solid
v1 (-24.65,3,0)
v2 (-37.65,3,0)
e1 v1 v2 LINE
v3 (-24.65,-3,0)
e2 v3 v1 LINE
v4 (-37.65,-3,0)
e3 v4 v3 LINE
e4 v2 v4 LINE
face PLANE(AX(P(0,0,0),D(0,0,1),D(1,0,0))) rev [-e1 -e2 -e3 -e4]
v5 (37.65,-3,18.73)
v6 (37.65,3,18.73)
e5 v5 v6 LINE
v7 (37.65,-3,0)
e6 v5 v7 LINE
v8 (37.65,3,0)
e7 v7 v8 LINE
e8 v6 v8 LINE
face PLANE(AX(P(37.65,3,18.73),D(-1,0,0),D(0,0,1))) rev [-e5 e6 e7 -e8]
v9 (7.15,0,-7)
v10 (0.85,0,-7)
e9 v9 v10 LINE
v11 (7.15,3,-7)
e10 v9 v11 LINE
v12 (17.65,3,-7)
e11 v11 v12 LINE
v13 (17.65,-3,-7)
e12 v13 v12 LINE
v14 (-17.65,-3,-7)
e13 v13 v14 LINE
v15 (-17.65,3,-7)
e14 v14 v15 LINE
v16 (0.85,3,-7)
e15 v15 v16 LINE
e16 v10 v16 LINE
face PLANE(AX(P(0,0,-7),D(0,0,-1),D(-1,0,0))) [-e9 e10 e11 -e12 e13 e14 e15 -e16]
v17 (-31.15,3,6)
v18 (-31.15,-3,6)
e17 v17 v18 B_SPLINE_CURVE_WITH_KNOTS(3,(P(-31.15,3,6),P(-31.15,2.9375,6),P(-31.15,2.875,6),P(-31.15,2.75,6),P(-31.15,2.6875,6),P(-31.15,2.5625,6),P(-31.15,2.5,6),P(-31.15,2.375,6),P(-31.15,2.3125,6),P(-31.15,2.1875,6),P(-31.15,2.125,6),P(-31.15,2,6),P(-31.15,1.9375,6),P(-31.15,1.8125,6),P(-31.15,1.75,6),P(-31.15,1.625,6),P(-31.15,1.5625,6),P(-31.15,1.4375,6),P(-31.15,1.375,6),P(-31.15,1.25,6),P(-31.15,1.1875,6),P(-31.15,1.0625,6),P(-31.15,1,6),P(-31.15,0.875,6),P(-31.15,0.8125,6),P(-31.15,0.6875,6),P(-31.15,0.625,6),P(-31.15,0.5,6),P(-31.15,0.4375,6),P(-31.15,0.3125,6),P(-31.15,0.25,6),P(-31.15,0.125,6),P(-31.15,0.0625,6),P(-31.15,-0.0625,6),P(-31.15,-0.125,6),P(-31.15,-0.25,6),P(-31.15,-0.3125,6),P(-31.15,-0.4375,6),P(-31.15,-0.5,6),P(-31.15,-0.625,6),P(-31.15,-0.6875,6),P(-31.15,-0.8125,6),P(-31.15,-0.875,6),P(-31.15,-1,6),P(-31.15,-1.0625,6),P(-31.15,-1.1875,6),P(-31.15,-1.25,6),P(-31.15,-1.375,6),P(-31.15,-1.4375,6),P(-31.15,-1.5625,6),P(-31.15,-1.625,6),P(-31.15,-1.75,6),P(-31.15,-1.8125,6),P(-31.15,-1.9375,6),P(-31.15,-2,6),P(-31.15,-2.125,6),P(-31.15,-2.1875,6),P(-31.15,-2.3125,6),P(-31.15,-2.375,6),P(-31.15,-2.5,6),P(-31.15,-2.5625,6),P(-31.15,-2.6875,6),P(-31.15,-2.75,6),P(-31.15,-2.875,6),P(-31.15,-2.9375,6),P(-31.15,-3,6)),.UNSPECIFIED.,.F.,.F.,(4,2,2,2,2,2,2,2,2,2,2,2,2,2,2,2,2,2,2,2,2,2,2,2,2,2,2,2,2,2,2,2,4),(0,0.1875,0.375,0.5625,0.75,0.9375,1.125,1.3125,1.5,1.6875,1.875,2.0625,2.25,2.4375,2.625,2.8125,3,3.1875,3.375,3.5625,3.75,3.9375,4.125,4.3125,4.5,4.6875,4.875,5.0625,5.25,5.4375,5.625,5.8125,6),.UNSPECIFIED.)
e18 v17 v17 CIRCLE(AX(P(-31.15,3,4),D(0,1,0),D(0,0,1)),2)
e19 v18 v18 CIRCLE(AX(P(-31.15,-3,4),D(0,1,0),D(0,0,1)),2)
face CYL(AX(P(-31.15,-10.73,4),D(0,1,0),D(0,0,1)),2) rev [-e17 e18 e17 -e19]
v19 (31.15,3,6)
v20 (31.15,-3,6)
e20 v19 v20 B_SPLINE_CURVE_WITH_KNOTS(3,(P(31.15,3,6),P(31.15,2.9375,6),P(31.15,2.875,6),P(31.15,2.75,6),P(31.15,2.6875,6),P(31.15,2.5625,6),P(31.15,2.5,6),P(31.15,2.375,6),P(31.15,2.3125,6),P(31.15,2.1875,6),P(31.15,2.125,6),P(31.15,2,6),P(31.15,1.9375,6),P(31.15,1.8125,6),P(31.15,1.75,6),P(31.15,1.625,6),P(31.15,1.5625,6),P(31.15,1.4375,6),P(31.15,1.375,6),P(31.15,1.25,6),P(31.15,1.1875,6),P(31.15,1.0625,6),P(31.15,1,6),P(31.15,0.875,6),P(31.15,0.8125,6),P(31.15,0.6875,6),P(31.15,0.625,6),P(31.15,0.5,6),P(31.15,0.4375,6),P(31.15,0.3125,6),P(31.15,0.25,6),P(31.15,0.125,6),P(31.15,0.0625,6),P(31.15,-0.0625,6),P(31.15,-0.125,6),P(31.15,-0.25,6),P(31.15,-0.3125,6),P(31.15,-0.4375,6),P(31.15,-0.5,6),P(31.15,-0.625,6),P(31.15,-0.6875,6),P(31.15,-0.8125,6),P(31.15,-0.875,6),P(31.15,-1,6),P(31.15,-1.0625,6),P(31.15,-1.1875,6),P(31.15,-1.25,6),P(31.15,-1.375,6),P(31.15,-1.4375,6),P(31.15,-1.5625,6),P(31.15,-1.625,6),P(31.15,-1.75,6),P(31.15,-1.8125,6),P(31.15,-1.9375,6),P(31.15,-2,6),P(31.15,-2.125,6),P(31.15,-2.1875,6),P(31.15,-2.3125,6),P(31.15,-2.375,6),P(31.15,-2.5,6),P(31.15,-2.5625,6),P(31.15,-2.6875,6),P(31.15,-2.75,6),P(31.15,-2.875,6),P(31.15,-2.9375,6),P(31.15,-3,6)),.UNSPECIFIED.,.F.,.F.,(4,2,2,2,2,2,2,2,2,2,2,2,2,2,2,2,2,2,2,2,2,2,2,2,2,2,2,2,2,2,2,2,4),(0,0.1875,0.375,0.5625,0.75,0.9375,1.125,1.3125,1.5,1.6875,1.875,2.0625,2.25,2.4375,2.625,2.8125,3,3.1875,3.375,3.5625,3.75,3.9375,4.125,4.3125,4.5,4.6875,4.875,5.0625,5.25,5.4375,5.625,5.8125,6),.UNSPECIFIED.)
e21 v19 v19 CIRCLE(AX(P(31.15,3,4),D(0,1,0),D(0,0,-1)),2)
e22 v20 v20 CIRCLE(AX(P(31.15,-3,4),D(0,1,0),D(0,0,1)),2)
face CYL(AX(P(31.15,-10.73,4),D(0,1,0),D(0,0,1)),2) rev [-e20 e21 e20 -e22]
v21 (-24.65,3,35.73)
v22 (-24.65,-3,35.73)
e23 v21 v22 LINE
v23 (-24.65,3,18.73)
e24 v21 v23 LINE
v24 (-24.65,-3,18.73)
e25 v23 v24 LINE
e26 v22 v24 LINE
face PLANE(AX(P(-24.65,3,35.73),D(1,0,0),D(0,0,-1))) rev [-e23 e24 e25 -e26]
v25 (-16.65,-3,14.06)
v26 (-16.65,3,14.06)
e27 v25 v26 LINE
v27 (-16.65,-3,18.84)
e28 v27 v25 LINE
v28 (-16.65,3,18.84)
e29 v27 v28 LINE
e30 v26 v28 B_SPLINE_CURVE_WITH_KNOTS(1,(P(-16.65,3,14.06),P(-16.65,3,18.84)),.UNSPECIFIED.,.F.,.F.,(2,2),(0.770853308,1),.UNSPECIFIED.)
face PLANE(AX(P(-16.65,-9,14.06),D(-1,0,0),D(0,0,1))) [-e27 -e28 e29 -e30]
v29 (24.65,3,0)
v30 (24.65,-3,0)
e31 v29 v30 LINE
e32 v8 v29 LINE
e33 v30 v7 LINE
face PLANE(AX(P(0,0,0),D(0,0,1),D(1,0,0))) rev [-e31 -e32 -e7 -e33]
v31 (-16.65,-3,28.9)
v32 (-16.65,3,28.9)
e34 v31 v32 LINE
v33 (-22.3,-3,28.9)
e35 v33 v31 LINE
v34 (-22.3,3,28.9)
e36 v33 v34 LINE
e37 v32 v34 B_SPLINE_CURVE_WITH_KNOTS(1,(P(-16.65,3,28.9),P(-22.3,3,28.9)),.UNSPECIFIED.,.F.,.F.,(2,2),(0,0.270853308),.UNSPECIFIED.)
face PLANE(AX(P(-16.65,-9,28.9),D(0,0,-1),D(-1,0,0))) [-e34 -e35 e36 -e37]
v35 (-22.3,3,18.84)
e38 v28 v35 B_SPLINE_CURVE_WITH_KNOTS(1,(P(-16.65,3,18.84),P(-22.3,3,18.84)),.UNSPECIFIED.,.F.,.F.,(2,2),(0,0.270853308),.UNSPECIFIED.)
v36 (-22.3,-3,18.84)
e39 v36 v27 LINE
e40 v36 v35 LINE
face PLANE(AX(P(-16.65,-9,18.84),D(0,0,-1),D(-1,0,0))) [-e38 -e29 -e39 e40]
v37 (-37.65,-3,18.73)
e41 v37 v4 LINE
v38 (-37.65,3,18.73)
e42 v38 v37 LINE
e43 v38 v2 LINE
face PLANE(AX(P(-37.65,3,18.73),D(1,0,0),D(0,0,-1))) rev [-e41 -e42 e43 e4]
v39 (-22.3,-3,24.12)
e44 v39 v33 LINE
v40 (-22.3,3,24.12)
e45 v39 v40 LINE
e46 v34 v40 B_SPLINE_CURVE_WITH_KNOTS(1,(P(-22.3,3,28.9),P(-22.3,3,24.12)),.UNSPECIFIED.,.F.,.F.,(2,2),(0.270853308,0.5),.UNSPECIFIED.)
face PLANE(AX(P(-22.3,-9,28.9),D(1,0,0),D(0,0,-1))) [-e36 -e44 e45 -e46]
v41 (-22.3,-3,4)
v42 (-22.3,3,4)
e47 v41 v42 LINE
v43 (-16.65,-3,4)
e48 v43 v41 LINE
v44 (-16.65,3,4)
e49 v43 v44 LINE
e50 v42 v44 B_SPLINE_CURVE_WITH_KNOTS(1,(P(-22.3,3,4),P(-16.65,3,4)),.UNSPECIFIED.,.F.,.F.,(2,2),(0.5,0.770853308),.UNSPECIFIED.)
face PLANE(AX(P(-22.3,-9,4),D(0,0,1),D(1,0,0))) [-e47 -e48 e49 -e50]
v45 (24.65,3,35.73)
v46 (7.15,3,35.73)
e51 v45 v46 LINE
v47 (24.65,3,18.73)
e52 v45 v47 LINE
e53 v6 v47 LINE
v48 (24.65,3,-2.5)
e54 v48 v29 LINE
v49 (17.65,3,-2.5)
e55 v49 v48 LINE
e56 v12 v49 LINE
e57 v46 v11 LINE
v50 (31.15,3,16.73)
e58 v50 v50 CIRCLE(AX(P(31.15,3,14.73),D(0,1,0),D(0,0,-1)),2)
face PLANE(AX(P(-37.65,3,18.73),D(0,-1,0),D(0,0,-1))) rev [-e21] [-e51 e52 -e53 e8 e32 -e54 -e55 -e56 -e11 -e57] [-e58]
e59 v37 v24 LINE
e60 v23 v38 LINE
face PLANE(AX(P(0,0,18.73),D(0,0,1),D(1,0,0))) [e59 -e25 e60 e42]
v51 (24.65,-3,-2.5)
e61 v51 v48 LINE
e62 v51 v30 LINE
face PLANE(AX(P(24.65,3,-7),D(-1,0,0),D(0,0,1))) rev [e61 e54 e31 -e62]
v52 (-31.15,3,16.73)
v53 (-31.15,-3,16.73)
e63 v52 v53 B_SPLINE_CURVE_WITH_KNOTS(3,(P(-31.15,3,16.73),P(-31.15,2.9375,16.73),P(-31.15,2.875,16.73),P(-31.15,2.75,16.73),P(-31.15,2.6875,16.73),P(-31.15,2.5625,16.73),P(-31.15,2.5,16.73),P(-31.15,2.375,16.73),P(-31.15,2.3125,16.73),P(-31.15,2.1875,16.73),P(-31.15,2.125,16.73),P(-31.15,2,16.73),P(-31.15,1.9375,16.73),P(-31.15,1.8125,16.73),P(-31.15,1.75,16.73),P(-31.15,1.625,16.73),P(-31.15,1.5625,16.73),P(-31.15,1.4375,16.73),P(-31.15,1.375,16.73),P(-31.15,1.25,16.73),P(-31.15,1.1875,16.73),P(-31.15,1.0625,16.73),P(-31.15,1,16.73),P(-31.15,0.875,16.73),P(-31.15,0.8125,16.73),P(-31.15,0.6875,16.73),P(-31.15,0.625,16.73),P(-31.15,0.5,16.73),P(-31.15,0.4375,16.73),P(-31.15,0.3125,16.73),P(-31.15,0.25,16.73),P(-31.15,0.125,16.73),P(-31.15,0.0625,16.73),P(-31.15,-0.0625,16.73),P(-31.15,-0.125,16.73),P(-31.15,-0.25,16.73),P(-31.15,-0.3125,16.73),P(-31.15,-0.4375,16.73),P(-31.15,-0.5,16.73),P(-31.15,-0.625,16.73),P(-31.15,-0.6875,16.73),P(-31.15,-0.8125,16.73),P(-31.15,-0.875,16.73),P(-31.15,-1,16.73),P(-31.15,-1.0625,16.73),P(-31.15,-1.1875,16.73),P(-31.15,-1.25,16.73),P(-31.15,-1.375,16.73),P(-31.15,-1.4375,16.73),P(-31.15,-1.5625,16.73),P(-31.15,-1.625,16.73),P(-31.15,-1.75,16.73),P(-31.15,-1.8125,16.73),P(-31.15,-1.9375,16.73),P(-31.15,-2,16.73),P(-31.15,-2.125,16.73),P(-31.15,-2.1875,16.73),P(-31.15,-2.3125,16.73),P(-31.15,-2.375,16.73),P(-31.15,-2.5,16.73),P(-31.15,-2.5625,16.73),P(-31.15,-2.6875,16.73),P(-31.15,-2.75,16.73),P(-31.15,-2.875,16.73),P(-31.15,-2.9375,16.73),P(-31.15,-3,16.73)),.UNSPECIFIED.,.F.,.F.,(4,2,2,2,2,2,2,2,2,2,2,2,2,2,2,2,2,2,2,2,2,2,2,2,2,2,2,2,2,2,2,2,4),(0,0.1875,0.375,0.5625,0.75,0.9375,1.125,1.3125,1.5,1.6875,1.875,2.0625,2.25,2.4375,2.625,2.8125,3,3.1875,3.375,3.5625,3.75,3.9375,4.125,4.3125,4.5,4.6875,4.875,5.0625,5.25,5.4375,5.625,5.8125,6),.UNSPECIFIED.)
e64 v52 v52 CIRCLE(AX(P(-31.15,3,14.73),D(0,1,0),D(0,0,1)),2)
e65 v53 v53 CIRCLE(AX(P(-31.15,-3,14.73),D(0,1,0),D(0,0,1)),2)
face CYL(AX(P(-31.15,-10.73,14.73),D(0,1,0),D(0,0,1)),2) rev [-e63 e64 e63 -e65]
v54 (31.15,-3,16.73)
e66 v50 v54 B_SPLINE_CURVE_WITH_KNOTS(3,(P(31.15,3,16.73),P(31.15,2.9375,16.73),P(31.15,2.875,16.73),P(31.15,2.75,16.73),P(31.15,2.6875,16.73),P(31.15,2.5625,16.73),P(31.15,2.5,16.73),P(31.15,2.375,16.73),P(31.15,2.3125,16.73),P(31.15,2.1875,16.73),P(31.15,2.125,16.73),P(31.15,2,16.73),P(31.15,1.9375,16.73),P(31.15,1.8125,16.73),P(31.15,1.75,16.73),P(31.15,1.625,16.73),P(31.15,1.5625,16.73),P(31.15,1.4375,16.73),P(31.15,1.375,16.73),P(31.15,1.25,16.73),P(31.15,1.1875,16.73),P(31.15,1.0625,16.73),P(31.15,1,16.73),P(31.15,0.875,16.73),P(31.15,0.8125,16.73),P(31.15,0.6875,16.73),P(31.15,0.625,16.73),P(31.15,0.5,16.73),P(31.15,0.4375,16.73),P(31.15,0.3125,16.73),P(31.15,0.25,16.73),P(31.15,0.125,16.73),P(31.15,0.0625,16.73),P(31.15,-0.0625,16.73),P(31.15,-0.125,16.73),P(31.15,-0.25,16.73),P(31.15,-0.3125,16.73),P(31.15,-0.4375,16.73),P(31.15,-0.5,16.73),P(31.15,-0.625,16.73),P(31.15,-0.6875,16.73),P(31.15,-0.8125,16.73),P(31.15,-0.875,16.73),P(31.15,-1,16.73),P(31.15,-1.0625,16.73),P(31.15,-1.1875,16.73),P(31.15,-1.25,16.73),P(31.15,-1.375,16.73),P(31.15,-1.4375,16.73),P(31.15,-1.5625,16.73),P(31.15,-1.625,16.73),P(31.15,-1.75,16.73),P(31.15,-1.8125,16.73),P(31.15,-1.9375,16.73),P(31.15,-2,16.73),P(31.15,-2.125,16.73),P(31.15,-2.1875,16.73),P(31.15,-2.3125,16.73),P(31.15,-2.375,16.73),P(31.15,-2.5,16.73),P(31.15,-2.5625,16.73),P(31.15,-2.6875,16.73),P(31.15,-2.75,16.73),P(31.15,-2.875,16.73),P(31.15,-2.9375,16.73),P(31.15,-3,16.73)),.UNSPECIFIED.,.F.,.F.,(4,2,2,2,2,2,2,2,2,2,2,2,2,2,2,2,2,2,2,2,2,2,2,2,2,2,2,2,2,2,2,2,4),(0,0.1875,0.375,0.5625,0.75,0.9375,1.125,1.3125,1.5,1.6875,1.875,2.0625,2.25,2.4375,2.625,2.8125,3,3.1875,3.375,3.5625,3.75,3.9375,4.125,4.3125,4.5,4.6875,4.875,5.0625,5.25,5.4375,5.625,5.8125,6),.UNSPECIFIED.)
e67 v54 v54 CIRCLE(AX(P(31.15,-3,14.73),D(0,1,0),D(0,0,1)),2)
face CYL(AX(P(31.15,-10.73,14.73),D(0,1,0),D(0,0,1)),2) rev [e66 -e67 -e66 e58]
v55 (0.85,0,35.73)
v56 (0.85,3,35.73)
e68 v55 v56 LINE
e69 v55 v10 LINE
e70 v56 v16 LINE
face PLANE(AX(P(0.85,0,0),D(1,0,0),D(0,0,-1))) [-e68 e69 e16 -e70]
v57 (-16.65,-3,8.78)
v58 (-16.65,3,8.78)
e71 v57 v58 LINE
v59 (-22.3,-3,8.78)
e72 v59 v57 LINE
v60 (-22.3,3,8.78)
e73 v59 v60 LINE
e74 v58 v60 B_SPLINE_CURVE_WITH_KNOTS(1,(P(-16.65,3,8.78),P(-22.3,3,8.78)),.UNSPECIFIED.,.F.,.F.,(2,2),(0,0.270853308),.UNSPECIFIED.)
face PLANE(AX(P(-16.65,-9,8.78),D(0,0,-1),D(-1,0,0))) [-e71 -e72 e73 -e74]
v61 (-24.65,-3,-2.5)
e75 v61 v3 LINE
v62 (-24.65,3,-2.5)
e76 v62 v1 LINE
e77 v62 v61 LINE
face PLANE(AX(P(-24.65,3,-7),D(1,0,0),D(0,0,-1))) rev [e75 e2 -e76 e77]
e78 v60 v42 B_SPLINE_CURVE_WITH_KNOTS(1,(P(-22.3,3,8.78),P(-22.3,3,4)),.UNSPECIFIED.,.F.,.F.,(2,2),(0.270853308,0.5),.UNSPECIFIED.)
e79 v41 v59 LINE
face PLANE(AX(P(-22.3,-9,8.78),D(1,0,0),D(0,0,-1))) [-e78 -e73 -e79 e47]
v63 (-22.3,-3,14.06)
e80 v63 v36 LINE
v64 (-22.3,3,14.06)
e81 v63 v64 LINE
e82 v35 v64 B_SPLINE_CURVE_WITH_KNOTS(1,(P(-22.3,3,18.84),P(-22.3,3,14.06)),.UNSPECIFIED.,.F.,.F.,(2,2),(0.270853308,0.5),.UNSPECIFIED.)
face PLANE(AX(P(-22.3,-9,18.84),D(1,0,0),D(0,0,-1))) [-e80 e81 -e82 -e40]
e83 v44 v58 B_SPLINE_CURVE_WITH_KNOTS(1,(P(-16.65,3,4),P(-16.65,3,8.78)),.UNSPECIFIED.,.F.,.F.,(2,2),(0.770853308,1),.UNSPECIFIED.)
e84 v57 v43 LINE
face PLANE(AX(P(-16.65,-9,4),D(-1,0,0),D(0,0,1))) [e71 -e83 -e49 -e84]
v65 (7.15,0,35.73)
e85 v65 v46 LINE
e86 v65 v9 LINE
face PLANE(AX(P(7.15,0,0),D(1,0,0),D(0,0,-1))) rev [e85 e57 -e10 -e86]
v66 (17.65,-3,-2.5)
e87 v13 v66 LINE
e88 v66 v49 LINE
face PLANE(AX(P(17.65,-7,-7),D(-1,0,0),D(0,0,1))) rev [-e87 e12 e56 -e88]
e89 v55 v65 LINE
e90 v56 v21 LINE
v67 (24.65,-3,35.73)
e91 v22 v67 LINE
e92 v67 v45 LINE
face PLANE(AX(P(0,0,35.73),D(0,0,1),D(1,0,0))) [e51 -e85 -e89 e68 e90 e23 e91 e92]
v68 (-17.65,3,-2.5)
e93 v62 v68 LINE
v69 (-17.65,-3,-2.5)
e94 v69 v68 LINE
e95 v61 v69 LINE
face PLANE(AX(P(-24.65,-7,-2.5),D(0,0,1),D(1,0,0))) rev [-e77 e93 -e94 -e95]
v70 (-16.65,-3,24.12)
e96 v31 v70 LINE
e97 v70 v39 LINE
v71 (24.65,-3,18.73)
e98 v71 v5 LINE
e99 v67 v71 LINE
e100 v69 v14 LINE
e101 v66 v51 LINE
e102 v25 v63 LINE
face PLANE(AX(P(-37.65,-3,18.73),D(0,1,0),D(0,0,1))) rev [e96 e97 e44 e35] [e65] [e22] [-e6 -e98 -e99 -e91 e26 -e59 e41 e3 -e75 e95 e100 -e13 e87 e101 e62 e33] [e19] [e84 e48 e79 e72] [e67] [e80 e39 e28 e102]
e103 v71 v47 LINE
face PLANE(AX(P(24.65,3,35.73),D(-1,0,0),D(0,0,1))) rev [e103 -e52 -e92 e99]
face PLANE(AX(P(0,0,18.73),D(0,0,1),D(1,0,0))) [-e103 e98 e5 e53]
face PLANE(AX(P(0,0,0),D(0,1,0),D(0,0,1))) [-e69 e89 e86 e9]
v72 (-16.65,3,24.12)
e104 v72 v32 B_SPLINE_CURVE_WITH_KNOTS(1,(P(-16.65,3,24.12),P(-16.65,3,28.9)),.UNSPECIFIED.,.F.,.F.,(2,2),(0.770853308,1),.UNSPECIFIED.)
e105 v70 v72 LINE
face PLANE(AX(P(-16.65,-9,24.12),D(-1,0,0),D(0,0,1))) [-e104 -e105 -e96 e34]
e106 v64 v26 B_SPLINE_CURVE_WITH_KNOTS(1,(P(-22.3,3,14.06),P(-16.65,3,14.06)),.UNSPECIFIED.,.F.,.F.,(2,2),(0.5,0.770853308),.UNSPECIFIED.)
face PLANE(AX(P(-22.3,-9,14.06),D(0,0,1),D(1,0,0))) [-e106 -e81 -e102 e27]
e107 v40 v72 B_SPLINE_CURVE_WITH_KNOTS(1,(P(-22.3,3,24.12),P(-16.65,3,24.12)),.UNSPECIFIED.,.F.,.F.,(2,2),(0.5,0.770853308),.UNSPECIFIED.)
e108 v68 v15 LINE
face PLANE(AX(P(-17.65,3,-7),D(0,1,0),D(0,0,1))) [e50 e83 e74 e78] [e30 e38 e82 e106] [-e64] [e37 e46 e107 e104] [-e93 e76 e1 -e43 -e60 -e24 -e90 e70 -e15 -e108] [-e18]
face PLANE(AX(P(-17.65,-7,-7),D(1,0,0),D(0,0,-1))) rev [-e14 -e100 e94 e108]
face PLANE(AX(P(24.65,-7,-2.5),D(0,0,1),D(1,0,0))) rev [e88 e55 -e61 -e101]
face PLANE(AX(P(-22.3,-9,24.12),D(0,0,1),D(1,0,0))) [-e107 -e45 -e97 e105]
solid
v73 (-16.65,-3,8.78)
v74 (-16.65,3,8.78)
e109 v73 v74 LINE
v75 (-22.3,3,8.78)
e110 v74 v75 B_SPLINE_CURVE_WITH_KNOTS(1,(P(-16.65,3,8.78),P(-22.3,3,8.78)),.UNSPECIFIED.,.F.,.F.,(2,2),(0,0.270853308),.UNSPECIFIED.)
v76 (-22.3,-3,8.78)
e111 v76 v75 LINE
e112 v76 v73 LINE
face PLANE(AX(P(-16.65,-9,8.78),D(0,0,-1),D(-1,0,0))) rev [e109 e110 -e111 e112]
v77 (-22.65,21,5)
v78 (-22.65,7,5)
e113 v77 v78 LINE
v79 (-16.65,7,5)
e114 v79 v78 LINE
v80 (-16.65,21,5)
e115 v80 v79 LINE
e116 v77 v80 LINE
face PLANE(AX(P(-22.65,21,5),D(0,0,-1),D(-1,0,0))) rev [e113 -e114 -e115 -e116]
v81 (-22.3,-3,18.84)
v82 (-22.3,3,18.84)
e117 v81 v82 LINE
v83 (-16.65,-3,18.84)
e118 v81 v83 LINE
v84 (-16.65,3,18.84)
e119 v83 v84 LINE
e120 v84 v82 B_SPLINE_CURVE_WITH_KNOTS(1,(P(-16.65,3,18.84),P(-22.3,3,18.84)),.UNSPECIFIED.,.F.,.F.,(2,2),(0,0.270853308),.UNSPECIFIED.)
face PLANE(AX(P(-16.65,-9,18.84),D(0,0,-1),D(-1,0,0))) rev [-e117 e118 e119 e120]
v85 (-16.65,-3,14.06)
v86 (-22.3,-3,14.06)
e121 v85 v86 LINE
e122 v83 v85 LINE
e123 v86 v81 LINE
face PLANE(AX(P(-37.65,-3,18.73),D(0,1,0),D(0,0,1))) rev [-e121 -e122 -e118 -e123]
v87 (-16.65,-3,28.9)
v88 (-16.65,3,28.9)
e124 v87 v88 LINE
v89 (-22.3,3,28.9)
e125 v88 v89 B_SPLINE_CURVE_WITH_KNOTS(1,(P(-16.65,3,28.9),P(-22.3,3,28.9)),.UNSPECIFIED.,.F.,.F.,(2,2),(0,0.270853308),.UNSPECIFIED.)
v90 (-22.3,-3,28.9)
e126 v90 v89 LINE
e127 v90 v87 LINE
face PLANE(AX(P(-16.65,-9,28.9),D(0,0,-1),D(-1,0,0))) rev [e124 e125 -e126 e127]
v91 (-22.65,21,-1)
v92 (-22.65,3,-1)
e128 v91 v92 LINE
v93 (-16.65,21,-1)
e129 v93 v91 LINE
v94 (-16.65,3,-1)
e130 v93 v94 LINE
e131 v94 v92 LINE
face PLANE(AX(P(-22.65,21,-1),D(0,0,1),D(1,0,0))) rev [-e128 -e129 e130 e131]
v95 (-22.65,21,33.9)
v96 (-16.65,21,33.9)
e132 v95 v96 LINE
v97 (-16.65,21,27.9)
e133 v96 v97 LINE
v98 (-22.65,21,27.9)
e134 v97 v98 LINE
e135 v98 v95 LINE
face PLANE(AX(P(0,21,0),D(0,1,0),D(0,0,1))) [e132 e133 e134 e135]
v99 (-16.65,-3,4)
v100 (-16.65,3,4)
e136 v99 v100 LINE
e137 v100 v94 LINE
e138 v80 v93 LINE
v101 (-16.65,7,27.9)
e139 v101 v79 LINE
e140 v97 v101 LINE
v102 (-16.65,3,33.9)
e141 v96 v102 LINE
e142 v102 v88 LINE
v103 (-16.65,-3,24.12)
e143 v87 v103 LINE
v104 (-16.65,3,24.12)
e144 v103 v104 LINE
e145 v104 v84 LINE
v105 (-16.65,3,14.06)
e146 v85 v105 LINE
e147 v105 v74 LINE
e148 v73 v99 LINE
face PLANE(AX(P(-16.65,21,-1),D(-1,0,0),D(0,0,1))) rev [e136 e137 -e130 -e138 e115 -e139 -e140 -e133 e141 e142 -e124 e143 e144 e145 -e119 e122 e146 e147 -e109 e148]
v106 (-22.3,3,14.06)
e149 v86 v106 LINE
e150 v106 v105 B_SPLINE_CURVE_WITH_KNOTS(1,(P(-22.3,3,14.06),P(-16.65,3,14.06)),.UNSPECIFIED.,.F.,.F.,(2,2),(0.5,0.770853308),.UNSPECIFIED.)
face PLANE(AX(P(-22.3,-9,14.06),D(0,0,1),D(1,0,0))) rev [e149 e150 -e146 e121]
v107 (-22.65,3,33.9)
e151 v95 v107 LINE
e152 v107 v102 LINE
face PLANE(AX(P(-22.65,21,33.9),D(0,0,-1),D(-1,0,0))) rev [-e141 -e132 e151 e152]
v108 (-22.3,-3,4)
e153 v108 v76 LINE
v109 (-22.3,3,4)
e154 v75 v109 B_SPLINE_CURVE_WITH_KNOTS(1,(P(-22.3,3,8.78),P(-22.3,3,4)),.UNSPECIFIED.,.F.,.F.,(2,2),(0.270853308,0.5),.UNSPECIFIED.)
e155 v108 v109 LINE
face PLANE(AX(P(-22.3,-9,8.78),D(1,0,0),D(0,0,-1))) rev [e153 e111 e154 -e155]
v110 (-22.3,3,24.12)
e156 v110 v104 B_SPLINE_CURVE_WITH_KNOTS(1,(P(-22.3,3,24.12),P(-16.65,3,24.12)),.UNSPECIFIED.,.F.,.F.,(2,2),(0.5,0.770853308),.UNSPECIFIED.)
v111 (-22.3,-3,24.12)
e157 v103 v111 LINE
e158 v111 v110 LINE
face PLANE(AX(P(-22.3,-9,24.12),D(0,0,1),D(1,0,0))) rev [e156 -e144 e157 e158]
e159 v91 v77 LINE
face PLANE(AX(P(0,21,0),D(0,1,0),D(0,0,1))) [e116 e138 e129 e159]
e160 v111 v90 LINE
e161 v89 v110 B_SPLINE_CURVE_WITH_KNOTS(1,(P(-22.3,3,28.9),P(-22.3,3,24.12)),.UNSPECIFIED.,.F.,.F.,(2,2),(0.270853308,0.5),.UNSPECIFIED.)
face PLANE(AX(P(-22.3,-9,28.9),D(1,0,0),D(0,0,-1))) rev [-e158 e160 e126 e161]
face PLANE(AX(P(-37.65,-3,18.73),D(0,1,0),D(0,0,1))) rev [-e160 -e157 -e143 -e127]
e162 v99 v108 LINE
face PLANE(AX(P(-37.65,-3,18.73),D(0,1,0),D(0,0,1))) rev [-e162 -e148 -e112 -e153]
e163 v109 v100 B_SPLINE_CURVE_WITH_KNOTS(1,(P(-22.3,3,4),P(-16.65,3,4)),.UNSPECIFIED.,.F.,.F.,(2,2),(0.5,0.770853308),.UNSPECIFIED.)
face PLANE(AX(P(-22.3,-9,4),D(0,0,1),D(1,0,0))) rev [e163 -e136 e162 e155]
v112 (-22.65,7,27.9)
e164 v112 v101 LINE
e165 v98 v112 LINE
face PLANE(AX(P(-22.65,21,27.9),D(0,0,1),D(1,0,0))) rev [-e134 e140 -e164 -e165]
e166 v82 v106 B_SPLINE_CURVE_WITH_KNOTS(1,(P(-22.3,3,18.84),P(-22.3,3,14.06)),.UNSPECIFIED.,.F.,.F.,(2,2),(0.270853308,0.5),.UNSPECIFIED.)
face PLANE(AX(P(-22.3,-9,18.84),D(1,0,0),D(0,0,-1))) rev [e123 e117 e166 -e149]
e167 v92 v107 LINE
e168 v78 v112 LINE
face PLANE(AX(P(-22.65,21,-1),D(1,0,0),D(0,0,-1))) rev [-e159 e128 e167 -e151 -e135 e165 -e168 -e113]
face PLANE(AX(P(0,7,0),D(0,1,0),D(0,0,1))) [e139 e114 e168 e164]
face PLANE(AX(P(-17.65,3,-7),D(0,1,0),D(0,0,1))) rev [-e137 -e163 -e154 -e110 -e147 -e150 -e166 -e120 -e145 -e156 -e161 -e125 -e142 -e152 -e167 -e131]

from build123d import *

# Parameters (mm, degrees)
SKETCH_2_W          = 75.3
SKETCH_2_H          = 6
EXTRUDE_1_DEPTH     = 18.73
SKETCH_3_R          = 2
CUT_EXTRUDE_1_DEPTH = 13.73
SKETCH_4_W          = 49.3
SKETCH_4_H          = 6
EXTRUDE_3_DEPTH     = 17
SKETCH_6_W          = 49.3
SKETCH_6_H          = 6
EXTRUDE_5_DEPTH     = 7
SKETCH_7_W          = 6
SKETCH_7_H          = 6
EXTRUDE_6_DEPTH     = 18
SKETCH_8_W          = 6.3
SKETCH_8_H          = 42.73
CUT_EXTRUDE_2_DEPTH = 3
SKETCH_9_W          = 7
SKETCH_9_H          = 4.5
CUT_EXTRUDE_3_DEPTH = 10
SKETCH_10_W         = 6
SKETCH_10_H         = 22.9
EXTRUDE_7_DEPTH     = 4
OTHER_START         = -22.3
OTHER_1_OUTLINE_W   = 6
OTHER_1_OUTLINE_H   = 4.78
OTHER_1_DEPTH       = 5.65
OTHER_1_2_OUTLINE_W = 6
OTHER_1_2_OUTLINE_H = 4.78
OTHER_1_2_DEPTH     = 5.65


# Read off the part's stored shape, not the designer's step: Разделить1, Выступы и прорези-Выступ1, Выступы и прорези-Прорезь1
with BuildPart() as part:
    # Эскиз2 → Бобышка-Вытянуть1 (new body)
    with BuildSketch(Plane.XY):
        Rectangle(SKETCH_2_W, SKETCH_2_H)
    extrude(amount=EXTRUDE_1_DEPTH)

    # Эскиз3 → Вырез-Вытянуть1 (cut)
    with BuildSketch(Plane(origin=(0, 3, 0), x_dir=(1, 0, 0), z_dir=(0, 1, 0))):
        with Locations(Location((-31.15, -4, 0), (0, 0, 270))):
            Circle(SKETCH_3_R)
        with Locations(Location((-31.15, -14.73, 0), (0, 0, 270))):
            Circle(SKETCH_3_R)
        with Locations(Location((31.15, -14.73, 0), (0, 0, 270))):
            Circle(SKETCH_3_R)
        with Locations(Location((31.15, -4, 0), (0, 0, 270))):
            Circle(SKETCH_3_R)
    extrude(amount=-CUT_EXTRUDE_1_DEPTH, mode=Mode.SUBTRACT)

    # Эскиз4 → Бобышка-Вытянуть3 (add)
    with BuildSketch(Plane.XY.offset(18.73)):
        Rectangle(SKETCH_4_W, SKETCH_4_H)
    extrude(amount=EXTRUDE_3_DEPTH)

    # Эскиз6 → Бобышка-Вытянуть5 (add)
    with BuildSketch(Plane(origin=(0, 0, 0), x_dir=(-1, 0, 0), z_dir=(0, 0, -1))):
        Rectangle(SKETCH_6_W, SKETCH_6_H)
    extrude(amount=EXTRUDE_5_DEPTH)

    # Эскиз7 → Бобышка-Вытянуть6 (add)
    with BuildSketch(Plane(origin=(0, 3, 0), x_dir=(1, 0, 0), z_dir=(0, 1, 0))):
        with Locations((-19.65, -2)):
            Rectangle(SKETCH_7_W, SKETCH_7_H)
        with Locations((-19.65, -30.9)):
            Rectangle(SKETCH_7_W, SKETCH_7_H)
    extrude(amount=EXTRUDE_6_DEPTH)

    # Эскиз8 → Вырез-Вытянуть2 (cut)
    with BuildSketch(Plane(origin=(0, 3, -43.99), x_dir=(-1, 0, 0), z_dir=(0, 1, 0))):
        with Locations((-4, 58.355)):
            Rectangle(SKETCH_8_W, SKETCH_8_H)
    extrude(amount=-CUT_EXTRUDE_2_DEPTH, mode=Mode.SUBTRACT)

    # Эскиз9 → Вырез-Вытянуть3 (cut)
    with BuildSketch(Plane(origin=(0, 3, 0), x_dir=(1, 0, 0), z_dir=(0, 1, 0))):
        with Locations((-21.15, 4.75)):
            Rectangle(SKETCH_9_W, SKETCH_9_H)
        with Locations((21.15, 4.75)):
            Rectangle(SKETCH_9_W, SKETCH_9_H)
    extrude(amount=-CUT_EXTRUDE_3_DEPTH, mode=Mode.SUBTRACT)

    # Эскиз10 → Бобышка-Вытянуть7 (add)
    with BuildSketch(Plane(origin=(0, 3, 0), x_dir=(1, 0, 0), z_dir=(0, 1, 0))):
        with Locations((-19.65, -16.45)):
            Rectangle(SKETCH_10_W, SKETCH_10_H)
    extrude(amount=EXTRUDE_7_DEPTH)


with BuildPart() as body_2:
    # Split Bodies 1: the piece on the far side of the plane
    add(part.part)
    split(bisect_by=Plane(origin=(0, 3, 0), x_dir=(1, 0, 0), z_dir=(0, 1, 0)), keep=Keep.BOTTOM)

    # Other 1 2 outline → Other 1 2 (cut)
    with BuildSketch(Plane.YZ.offset(OTHER_START)):
        with Locations((0, 26.51)):
            Rectangle(OTHER_1_2_OUTLINE_W, OTHER_1_2_OUTLINE_H)
        with Locations((0, 16.45)):
            Rectangle(OTHER_1_2_OUTLINE_W, OTHER_1_2_OUTLINE_H)
        with Locations((0, 6.39)):
            Rectangle(OTHER_1_2_OUTLINE_W, OTHER_1_2_OUTLINE_H)
    extrude(amount=OTHER_1_2_DEPTH, mode=Mode.SUBTRACT)


with BuildPart() as part_1:
    add(part.part)

    # Split Bodies 1
    split(bisect_by=Plane(origin=(0, 3, 0), x_dir=(1, 0, 0), z_dir=(0, 1, 0)), keep=Keep.TOP)

    # Other 1 outline → Other 1 (add)
    with BuildSketch(Plane.YZ.offset(OTHER_START)):
        with Locations((0, 6.39)):
            Rectangle(OTHER_1_OUTLINE_W, OTHER_1_OUTLINE_H)
        with Locations((0, 16.45)):
            Rectangle(OTHER_1_OUTLINE_W, OTHER_1_OUTLINE_H)
        with Locations((0, 26.51)):
            Rectangle(OTHER_1_OUTLINE_W, OTHER_1_OUTLINE_H)
    extrude(amount=OTHER_1_DEPTH)


solid = Compound([body_2.part, part_1.part])
